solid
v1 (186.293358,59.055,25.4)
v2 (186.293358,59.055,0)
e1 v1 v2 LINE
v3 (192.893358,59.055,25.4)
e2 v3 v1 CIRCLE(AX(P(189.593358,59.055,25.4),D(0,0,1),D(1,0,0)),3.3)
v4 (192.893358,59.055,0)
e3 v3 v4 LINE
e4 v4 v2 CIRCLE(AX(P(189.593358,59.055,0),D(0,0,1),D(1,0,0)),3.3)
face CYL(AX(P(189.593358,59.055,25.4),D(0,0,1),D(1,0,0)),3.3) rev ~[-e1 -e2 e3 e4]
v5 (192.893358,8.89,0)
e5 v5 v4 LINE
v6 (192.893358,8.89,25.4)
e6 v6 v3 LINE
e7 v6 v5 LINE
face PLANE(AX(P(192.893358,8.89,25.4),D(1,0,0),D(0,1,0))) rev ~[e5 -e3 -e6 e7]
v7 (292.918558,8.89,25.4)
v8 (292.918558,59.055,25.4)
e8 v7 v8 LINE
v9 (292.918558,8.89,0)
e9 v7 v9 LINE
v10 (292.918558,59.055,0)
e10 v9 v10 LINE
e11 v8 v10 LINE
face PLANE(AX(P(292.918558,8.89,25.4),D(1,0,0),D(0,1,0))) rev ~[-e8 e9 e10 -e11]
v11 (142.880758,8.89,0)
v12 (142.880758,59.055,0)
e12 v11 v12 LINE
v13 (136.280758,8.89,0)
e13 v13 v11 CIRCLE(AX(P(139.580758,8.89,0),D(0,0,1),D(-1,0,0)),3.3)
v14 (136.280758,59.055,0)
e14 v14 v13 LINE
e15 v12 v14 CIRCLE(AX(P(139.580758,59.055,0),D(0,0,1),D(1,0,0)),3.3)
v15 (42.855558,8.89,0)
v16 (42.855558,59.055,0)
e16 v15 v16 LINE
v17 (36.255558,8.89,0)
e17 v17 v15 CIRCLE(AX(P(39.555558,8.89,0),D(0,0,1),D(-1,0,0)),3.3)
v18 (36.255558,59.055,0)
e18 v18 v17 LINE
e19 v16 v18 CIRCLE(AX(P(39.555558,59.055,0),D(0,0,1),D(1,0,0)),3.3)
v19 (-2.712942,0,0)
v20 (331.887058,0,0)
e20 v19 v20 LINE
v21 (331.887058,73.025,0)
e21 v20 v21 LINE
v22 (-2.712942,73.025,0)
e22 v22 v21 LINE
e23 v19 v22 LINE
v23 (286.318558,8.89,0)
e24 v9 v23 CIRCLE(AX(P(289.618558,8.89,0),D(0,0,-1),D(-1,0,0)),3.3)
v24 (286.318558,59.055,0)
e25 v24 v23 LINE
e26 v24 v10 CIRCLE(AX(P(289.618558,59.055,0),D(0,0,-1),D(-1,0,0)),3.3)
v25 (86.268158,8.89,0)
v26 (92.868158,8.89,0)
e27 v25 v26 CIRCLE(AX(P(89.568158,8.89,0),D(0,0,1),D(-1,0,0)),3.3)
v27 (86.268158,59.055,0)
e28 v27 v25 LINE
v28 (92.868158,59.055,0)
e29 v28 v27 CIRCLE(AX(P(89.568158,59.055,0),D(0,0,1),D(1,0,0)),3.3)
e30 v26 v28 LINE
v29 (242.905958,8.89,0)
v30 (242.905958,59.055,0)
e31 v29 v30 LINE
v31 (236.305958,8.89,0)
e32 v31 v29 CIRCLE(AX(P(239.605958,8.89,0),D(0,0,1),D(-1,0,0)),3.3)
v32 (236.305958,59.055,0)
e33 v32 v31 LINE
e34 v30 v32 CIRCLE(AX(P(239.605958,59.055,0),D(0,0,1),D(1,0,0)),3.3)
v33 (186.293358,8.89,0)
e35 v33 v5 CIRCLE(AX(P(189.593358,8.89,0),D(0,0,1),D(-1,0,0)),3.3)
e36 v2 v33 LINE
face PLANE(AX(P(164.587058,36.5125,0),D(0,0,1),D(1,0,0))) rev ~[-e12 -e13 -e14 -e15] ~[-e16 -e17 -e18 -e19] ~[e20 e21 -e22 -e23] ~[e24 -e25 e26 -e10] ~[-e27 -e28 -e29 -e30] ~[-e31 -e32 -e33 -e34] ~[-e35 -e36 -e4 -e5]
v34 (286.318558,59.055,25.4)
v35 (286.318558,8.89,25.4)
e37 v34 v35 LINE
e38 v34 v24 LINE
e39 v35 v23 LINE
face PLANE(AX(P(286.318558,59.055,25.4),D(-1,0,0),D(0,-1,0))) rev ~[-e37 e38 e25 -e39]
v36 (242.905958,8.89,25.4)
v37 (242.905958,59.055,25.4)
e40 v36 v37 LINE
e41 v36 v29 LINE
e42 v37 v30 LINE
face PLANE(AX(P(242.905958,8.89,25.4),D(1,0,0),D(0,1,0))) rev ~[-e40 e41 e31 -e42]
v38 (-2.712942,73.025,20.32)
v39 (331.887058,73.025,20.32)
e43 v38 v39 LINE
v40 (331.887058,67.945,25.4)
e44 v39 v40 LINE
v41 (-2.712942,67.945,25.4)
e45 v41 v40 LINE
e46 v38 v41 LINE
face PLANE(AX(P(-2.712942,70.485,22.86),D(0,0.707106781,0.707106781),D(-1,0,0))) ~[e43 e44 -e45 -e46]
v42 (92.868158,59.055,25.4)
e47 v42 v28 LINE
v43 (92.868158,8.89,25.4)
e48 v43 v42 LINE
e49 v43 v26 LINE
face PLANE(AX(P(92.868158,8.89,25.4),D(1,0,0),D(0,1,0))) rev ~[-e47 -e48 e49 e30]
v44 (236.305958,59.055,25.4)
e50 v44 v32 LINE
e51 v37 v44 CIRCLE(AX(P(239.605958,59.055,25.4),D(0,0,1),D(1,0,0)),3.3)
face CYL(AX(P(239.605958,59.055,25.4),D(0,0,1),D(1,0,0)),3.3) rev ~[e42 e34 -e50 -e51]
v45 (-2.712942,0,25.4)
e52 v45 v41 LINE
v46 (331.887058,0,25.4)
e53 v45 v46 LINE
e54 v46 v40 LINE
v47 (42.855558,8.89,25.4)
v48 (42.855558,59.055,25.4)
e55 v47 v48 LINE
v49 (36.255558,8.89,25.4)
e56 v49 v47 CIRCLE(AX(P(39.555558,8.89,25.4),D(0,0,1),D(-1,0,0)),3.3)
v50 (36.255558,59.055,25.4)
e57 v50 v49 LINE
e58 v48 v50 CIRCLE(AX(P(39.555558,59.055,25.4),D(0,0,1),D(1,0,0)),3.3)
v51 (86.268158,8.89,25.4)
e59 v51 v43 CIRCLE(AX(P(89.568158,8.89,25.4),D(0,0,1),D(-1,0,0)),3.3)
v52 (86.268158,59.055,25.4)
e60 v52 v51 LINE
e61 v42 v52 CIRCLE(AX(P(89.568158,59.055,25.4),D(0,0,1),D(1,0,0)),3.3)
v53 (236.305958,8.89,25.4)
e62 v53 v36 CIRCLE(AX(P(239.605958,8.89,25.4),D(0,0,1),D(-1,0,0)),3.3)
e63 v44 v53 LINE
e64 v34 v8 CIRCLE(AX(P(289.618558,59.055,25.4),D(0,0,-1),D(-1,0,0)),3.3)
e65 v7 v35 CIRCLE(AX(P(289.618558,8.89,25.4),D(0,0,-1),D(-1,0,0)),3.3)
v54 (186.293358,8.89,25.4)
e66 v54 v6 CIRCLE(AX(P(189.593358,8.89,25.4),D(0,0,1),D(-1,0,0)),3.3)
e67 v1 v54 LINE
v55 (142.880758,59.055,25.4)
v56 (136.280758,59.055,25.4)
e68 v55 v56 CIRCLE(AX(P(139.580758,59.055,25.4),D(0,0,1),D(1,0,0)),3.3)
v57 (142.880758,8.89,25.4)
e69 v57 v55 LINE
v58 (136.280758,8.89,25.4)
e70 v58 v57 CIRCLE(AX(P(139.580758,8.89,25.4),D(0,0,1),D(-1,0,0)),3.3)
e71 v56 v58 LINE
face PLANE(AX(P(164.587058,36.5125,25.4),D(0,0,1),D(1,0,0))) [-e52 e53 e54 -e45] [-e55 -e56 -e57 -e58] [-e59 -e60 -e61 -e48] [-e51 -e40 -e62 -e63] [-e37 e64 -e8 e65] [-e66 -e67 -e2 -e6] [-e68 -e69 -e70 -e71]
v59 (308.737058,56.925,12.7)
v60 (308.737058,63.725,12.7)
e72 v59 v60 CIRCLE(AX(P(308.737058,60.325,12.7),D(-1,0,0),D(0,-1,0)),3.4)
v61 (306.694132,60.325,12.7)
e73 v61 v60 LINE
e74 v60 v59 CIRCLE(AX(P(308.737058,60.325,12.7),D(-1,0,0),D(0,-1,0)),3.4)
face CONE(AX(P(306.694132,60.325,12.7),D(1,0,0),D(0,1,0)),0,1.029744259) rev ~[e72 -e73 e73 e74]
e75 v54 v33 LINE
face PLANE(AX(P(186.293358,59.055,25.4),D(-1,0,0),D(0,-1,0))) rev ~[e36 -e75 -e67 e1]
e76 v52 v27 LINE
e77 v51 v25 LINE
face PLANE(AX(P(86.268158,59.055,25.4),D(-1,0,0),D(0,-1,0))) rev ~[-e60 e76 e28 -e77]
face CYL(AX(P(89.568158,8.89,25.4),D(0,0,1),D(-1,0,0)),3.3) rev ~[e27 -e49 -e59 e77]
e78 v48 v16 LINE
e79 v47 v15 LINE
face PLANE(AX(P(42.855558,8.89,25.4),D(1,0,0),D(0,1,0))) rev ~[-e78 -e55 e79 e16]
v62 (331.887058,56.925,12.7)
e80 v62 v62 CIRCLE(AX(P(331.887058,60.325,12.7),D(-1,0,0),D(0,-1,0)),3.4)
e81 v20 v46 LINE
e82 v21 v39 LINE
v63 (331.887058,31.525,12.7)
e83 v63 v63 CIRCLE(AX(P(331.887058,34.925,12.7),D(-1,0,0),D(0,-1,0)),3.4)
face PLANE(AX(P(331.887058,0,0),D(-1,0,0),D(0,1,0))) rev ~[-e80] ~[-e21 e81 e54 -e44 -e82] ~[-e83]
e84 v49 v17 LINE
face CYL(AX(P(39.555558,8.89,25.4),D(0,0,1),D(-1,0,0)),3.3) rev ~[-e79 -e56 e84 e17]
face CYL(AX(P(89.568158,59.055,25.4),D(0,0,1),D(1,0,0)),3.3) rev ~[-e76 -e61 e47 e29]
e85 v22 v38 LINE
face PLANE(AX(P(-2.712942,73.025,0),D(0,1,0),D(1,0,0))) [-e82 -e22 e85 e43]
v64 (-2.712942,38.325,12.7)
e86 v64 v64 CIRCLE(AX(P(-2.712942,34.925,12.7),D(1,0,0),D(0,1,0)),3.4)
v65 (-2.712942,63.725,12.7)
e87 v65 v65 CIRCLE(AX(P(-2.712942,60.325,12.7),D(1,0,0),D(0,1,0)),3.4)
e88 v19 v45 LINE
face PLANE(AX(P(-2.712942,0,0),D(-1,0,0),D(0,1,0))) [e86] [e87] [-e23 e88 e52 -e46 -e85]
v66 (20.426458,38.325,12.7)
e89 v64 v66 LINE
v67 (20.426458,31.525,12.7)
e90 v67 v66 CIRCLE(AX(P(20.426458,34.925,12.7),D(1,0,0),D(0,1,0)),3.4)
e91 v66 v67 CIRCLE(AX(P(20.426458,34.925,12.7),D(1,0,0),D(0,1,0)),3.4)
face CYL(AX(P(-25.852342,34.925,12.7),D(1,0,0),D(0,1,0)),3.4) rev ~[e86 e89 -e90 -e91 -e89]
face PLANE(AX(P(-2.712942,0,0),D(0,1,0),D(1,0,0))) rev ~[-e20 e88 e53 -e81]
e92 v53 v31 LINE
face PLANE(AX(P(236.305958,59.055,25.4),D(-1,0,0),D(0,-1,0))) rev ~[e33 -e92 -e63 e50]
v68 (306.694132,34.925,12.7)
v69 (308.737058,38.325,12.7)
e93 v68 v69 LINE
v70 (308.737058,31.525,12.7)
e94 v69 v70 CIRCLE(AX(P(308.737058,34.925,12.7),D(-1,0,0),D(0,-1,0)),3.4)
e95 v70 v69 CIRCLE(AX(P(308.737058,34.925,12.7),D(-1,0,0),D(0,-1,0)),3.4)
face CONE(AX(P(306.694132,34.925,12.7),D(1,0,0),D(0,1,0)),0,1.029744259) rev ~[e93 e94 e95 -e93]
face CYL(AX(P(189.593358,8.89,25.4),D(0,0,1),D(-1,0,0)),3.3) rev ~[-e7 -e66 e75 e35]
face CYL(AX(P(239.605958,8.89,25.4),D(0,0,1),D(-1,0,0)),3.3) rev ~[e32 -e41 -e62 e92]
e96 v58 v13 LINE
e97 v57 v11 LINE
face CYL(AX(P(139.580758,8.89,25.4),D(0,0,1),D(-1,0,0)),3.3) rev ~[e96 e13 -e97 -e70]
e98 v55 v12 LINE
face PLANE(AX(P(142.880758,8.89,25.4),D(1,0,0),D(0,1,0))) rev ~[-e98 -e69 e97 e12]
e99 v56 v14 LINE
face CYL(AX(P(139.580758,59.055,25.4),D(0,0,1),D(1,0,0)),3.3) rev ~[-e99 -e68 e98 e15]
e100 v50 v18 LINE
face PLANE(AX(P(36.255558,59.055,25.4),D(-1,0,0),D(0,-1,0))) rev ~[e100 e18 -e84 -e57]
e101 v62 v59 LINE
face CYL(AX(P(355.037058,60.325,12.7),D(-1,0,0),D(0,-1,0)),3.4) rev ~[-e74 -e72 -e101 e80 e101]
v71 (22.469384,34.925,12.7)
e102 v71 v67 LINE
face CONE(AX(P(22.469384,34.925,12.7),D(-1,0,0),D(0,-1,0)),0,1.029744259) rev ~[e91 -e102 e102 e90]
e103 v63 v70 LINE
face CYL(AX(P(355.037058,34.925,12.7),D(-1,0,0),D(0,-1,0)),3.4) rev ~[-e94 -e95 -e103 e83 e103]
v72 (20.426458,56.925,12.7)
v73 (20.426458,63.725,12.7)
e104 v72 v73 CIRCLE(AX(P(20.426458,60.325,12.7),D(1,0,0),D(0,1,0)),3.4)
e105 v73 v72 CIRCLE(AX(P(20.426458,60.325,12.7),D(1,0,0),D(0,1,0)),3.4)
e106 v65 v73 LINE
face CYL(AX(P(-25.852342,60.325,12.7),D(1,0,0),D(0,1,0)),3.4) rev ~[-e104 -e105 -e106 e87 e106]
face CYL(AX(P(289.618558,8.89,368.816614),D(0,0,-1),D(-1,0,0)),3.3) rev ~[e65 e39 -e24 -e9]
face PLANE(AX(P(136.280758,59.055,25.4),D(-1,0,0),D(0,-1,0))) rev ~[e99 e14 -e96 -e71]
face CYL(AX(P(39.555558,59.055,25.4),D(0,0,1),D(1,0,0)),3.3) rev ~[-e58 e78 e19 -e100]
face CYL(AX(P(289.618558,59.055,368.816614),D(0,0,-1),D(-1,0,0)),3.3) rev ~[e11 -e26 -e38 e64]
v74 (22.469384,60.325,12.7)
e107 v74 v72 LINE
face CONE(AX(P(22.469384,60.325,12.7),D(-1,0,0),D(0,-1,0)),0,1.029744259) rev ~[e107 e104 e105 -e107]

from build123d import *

# Parameters (mm, degrees)
F0_W      = 334.6
F0_H      = 73.025
F1_DEPTH  = 25.4
F2_SIZE   = 5.08
F4_D      = 6.8
F4_DEPTH  = 23.15
F4_TIP    = 2.0429261047
F6_D      = 6.8
F6_DEPTH  = 23.1394
F6_TIP    = 2.0429261047
F8_D      = 6.6
F10_DEPTH = 25.4
F12_DEPTH = 25.4


# Not quite as in the source:
# - a feature names something its author has since deleted; it is built from what else it names


with BuildPart() as f1:
    # F0 (on Top) → F1 (new body)
    with BuildSketch(Plane.XY):
        with Locations((164.5870582715, 36.5125)):
            Rectangle(F0_W, F0_H)
    extrude(amount=F1_DEPTH)

    # F2
    f2_edges = [f1.edges().sort_by_distance(p)[0] for p in [
        (164.587058, 73.025, 25.4),
    ]]
    chamfer(f2_edges, length=F2_SIZE)

    # F4
    with Locations(Plane.YZ.offset(331.8870582715)):
        with Locations((34.925, 12.7), (60.325, 12.7)):
            Hole(F4_D / 2, depth=F4_DEPTH)
            with Locations((0, 0, -(F4_DEPTH + F4_TIP / 2))):  # 118° drill point
                Cone(0, F4_D / 2, F4_TIP, mode=Mode.SUBTRACT)

    # F6
    with Locations(Plane(origin=(-2.7129417285, 0, 0), x_dir=(0, -1, 0), z_dir=(-1, 0, 0))):
        with Locations((-60.325, 12.7), (-34.925, 12.7)):
            Hole(F6_D / 2, depth=F6_DEPTH)
            with Locations((0, 0, -(F6_DEPTH + F6_TIP / 2))):  # 118° drill point
                Cone(0, F6_D / 2, F6_TIP, mode=Mode.SUBTRACT)

    # F8 (through all)
    with Locations(Plane.XY.offset(25.4)):
        with Locations((289.6185582715, 8.89), (289.6185582715, 59.055)):
            Hole(F8_D / 2)

    # F9 (on face) → F10 (cut)
    with BuildSketch(Plane.XY.offset(25.4)):
        with BuildLine():
            ThreePointArc((286.3185582715, 8.89), (289.6185582715, 12.19), (292.9185582715, 8.89))
            Line((292.9185582715, 8.89), (292.9185582715, 59.055))
            ThreePointArc((292.9185582715, 59.055), (289.6185582715, 55.755), (286.3185582715, 59.055))
            Line((286.3185582715, 59.055), (286.3185582715, 8.89))
        make_face()
    extrude(amount=-F10_DEPTH, mode=Mode.SUBTRACT)

    # F11 (on face) → F12 (cut)
    with BuildSketch(Plane.XY.offset(25.4)):
        with BuildLine():
            ThreePointArc((236.3059582715, 8.89), (239.6059582715, 5.59), (242.9059582715, 8.89))
            Line((242.9059582715, 8.89), (242.9059582715, 59.055))
            ThreePointArc((242.9059582715, 59.055), (239.6059582715, 62.355), (236.3059582715, 59.055))
            Line((236.3059582715, 59.055), (236.3059582715, 8.89))
        make_face()
        with BuildLine():
            ThreePointArc((186.2933582715, 8.89), (189.5933582715, 5.59), (192.8933582715, 8.89))
            Line((192.8933582715, 8.89), (192.8933582715, 59.055))
            ThreePointArc((192.8933582715, 59.055), (189.5933582715, 62.355), (186.2933582715, 59.055))
            Line((186.2933582715, 59.055), (186.2933582715, 8.89))
        make_face()
        with BuildLine():
            ThreePointArc((136.2807582715, 8.89), (139.5807582715, 5.59), (142.8807582715, 8.89))
            Line((142.8807582715, 8.89), (142.8807582715, 59.055))
            ThreePointArc((142.8807582715, 59.055), (139.5807582715, 62.355), (136.2807582715, 59.055))
            Line((136.2807582715, 59.055), (136.2807582715, 8.89))
        make_face()
        with BuildLine():
            ThreePointArc((86.2681582715, 8.89), (89.5681582715, 5.59), (92.8681582715, 8.89))
            Line((92.8681582715, 8.89), (92.8681582715, 59.055))
            ThreePointArc((92.8681582715, 59.055), (89.5681582715, 62.355), (86.2681582715, 59.055))
            Line((86.2681582715, 59.055), (86.2681582715, 8.89))
        make_face()
        with BuildLine():
            ThreePointArc((36.2555582715, 8.89), (39.5555582715, 5.59), (42.8555582715, 8.89))
            Line((42.8555582715, 8.89), (42.8555582715, 59.055))
            ThreePointArc((42.8555582715, 59.055), (39.5555582715, 62.355), (36.2555582715, 59.055))
            Line((36.2555582715, 59.055), (36.2555582715, 8.89))
        make_face()
    extrude(amount=-F12_DEPTH, mode=Mode.SUBTRACT)


solid = f1.part
